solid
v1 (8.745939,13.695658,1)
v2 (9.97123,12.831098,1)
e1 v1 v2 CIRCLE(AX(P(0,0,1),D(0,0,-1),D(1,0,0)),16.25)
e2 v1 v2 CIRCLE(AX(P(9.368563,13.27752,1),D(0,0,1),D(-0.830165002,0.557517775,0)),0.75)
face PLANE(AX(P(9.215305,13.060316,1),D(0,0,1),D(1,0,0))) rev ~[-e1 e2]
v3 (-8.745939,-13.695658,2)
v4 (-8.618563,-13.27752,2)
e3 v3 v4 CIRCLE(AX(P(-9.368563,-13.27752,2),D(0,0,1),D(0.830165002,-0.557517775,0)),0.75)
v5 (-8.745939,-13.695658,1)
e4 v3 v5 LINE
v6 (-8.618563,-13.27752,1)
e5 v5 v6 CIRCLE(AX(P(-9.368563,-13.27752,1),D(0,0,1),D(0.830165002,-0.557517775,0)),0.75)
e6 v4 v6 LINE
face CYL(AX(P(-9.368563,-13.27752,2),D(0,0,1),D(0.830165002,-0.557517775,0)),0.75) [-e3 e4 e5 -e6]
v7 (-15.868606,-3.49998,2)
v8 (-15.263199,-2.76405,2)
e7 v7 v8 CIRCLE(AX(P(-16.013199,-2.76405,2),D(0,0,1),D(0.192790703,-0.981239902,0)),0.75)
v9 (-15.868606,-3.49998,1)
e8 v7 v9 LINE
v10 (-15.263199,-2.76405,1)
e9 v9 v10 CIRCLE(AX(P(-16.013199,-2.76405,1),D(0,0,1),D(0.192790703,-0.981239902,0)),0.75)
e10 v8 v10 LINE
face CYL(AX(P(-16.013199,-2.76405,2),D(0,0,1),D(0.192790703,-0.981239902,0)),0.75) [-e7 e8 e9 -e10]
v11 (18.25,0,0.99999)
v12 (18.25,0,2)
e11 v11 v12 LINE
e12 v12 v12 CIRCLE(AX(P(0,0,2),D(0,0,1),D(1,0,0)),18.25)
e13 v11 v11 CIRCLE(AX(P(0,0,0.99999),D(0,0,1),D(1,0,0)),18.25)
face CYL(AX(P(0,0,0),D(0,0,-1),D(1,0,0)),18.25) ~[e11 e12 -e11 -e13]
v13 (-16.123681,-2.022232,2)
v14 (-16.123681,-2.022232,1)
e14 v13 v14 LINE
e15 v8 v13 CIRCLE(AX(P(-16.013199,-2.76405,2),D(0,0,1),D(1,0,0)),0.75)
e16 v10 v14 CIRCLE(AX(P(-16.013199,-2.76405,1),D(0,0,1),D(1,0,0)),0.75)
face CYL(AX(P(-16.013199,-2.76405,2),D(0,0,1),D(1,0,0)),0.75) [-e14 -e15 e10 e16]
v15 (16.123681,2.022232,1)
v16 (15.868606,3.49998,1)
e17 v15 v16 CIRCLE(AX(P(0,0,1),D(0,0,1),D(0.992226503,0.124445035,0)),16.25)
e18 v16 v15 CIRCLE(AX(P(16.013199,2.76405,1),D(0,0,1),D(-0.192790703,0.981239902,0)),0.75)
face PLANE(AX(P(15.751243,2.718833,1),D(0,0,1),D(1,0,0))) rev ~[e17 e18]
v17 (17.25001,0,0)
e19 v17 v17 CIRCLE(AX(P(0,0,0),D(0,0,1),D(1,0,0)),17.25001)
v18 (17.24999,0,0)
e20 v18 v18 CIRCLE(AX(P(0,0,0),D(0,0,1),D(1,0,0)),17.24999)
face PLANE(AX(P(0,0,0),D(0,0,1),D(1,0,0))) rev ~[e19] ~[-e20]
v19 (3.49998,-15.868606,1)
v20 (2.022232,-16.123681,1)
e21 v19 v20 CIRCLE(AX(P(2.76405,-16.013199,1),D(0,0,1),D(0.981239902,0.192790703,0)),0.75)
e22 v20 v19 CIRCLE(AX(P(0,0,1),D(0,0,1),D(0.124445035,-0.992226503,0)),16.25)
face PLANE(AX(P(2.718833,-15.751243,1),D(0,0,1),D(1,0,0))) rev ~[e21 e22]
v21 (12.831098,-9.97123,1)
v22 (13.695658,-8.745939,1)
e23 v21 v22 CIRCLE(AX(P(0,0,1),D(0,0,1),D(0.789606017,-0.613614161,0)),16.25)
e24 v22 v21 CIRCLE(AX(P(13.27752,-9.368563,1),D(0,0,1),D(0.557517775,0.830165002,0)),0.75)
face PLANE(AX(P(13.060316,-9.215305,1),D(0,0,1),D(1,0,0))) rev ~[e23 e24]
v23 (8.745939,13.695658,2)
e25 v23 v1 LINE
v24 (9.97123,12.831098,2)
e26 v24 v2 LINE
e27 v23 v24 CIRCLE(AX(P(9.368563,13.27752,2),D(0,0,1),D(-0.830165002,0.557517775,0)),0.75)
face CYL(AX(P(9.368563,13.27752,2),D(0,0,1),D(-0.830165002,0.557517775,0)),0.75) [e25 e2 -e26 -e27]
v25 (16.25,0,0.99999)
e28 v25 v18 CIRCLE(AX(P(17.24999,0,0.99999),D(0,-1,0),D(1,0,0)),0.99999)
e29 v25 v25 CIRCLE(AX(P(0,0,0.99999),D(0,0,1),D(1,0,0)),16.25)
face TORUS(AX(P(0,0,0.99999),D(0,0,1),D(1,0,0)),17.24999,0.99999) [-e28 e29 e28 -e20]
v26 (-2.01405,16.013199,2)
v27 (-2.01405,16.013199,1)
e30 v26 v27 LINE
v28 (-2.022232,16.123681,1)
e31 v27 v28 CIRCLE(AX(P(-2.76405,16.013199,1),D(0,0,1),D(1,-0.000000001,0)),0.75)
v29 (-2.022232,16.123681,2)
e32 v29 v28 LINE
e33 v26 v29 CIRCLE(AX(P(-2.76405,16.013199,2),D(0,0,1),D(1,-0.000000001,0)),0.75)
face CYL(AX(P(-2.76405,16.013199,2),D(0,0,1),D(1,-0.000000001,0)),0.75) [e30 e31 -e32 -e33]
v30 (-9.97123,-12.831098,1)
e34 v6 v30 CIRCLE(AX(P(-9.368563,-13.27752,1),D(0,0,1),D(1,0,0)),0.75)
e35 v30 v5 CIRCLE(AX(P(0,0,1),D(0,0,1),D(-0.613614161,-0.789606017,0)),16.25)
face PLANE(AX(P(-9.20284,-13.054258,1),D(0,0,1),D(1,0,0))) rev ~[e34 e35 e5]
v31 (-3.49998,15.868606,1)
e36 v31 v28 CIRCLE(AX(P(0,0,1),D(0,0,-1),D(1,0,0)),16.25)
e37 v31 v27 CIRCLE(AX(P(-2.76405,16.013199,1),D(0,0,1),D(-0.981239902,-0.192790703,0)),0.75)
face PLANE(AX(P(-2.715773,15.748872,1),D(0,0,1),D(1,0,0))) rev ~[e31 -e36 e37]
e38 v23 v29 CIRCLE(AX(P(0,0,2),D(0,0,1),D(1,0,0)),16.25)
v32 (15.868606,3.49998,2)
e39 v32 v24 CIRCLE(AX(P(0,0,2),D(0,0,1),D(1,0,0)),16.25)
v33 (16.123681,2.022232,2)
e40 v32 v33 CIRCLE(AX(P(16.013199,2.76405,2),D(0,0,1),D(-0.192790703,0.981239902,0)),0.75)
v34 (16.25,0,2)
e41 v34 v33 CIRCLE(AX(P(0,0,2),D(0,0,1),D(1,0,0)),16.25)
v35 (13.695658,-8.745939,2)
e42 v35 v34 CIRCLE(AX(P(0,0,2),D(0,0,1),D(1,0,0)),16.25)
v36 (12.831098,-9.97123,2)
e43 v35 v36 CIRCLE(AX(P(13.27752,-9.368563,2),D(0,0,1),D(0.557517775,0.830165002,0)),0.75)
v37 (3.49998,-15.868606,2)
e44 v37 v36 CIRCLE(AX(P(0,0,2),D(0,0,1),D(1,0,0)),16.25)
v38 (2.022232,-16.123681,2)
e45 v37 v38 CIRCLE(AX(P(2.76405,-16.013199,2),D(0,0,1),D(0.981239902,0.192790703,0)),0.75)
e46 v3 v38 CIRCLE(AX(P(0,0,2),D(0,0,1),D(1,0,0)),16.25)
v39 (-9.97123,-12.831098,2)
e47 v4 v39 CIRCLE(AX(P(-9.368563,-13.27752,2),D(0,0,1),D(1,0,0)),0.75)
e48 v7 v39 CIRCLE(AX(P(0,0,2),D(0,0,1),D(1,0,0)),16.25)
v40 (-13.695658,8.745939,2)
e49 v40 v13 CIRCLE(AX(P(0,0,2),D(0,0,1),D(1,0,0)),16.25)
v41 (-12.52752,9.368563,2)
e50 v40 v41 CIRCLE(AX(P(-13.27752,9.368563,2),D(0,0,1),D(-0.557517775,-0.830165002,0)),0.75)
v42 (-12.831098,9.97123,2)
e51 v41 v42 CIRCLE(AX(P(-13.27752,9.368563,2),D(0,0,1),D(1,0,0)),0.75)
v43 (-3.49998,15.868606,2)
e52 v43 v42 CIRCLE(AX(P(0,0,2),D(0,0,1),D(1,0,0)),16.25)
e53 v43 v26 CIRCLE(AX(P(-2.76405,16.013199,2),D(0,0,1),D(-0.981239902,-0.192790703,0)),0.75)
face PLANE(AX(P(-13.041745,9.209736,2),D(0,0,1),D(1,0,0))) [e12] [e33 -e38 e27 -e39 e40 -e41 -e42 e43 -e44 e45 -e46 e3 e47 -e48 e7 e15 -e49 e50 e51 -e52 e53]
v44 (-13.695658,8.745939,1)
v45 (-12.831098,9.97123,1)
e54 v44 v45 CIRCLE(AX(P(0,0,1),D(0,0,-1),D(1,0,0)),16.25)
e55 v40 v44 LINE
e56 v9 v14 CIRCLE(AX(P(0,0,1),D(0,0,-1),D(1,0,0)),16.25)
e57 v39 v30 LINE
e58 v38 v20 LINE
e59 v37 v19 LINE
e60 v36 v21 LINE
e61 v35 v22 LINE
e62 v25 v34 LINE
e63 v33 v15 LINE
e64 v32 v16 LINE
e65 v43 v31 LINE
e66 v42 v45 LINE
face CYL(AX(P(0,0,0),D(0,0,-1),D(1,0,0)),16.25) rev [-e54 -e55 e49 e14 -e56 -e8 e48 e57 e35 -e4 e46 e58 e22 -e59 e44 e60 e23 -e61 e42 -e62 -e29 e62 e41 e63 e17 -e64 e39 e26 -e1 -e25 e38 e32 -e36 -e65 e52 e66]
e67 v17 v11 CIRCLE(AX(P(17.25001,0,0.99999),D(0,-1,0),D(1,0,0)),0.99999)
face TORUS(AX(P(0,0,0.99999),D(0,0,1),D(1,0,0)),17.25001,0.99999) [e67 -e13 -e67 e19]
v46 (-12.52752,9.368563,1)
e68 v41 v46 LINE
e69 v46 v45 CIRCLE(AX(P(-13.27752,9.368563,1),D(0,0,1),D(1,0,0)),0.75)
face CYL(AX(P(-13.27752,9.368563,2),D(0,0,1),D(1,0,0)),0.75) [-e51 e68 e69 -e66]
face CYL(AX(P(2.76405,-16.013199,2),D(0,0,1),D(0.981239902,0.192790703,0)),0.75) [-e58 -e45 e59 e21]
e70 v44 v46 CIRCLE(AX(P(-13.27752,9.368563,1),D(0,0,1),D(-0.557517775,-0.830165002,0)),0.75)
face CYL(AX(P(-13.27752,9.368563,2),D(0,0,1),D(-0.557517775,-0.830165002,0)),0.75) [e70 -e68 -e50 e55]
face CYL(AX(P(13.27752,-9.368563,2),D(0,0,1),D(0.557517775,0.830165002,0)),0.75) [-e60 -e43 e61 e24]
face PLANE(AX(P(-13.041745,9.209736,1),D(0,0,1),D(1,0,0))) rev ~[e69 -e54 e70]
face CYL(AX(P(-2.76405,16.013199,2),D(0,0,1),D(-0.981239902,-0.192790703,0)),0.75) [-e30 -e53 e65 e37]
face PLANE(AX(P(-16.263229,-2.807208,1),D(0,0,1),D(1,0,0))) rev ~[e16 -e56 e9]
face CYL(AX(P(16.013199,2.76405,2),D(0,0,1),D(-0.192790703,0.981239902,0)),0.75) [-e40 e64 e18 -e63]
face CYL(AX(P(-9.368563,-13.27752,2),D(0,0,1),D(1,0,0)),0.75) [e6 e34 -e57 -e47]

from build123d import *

# Parameters (mm, degrees)
F0_R     = 18.25
F0_R_2   = 16.25
F1_DEPTH = 2
F3_DEPTH = 1
F4_R     = 0.99999


# Not quite as in the source:
# - a fillet or chamfer is up to 0.001 mm smaller than in the source, because OpenCascade refuses the exact size


with BuildPart() as f1:
    # F0 (on Top) → F1 (new body)
    with BuildSketch(Plane.XY):
        Circle(F0_R)
        Circle(F0_R_2, mode=Mode.SUBTRACT)
    extrude(amount=F1_DEPTH)

    # F2 (on face) → F3 (join)
    with BuildSketch(Plane.XY.offset(2)):
        with BuildLine():
            ThreePointArc((-13.6956579083, 8.7459393126), (-12.9247475177, 8.70670819), (-12.5275195769, 9.368563064))
            ThreePointArc((-12.5275195769, 9.368563064), (-12.6077000662, 9.7059676033), (-12.8310977719, 9.9712301131))
            ThreePointArc((-12.8310977719, 9.9712301131), (-13.2775195769, 9.368563064), (-13.6956579083, 8.7459393126))
        make_face()
        with BuildLine():
            ThreePointArc((-13.6956579083, 8.7459393126), (-13.2775195769, 9.368563064), (-12.8310977719, 9.9712301131))
            ThreePointArc((-12.8310977719, 9.9712301131), (-13.8903281728, 9.8009582824), (-13.6956579083, 8.7459393126))
        make_face()
        with BuildLine():
            ThreePointArc((-2.0222318148, 16.1236806743), (-2.7640496576, 16.0131986027), (-3.4999795839, 15.8686055755))
            ThreePointArc((-3.4999795839, 15.8686055755), (-2.6914116674, 15.2667244087), (-2.0140496576, 16.0131986027))
            ThreePointArc((-2.0140496576, 16.0131986027), (-2.016097994, 16.0685909213), (-2.0222318148, 16.1236806743))
        make_face()
        with BuildLine():
            ThreePointArc((-2.0222318148, 16.1236806743), (-2.8916211803, 16.7522693075), (-3.4999795839, 15.8686055755))
            ThreePointArc((-3.4999795839, 15.8686055755), (-2.7640496576, 16.0131986027), (-2.0222318148, 16.1236806743))
        make_face()
        with BuildLine():
            ThreePointArc((-15.8686055755, -3.4999795839), (-16.0131986027, -2.7640496576), (-16.1236806743, -2.0222318148))
            ThreePointArc((-16.1236806743, -2.0222318148), (-16.7522693075, -2.8916211803), (-15.8686055755, -3.4999795839))
        make_face()
        with BuildLine():
            ThreePointArc((-15.2631986027, -2.7640496576), (-15.5234851935, -2.1959996802), (-16.1236806743, -2.0222318148))
            ThreePointArc((-16.1236806743, -2.0222318148), (-16.0131986027, -2.7640496576), (-15.8686055755, -3.4999795839))
            ThreePointArc((-15.8686055755, -3.4999795839), (-15.4339988227, -3.2405238067), (-15.2631986027, -2.7640496576))
        make_face()
        with BuildLine():
            ThreePointArc((9.9712301131, 12.8310977719), (9.368563064, 13.2775195769), (8.7459393126, 13.6956579083))
            ThreePointArc((8.7459393126, 13.6956579083), (8.9361678457, 12.664710981), (9.9712301131, 12.8310977719))
        make_face()
        with BuildLine():
            ThreePointArc((10.118563064, 13.2775195769), (9.5871176184, 13.9949691617), (8.7459393126, 13.6956579083))
            ThreePointArc((8.7459393126, 13.6956579083), (9.368563064, 13.2775195769), (9.9712301131, 12.8310977719))
            ThreePointArc((9.9712301131, 12.8310977719), (10.0807780199, 13.0424666965), (10.118563064, 13.2775195769))
        make_face()
        with BuildLine():
            ThreePointArc((-8.618563064, -13.2775195769), (-9.1335101836, -12.565304621), (-9.9712301131, -12.8310977719))
            ThreePointArc((-9.9712301131, -12.8310977719), (-9.368563064, -13.2775195769), (-8.7459393126, -13.6956579083))
            ThreePointArc((-8.7459393126, -13.6956579083), (-8.6511134792, -13.4960741312), (-8.618563064, -13.2775195769))
        make_face()
        with BuildLine():
            ThreePointArc((16.1236806743, 2.0222318148), (16.0131986027, 2.7640496576), (15.8686055755, 3.4999795839))
            ThreePointArc((15.8686055755, 3.4999795839), (15.274127898, 2.6364781349), (16.1236806743, 2.0222318148))
        make_face()
        with BuildLine():
            ThreePointArc((3.4999795839, -15.8686055755), (2.6364781349, -15.274127898), (2.0222318148, -16.1236806743))
            ThreePointArc((2.0222318148, -16.1236806743), (2.7640496576, -16.0131986027), (3.4999795839, -15.8686055755))
        make_face()
        with BuildLine():
            ThreePointArc((13.6956579083, -8.7459393126), (12.664710981, -8.9361678457), (12.8310977719, -9.9712301131))
            ThreePointArc((12.8310977719, -9.9712301131), (13.2775195769, -9.368563064), (13.6956579083, -8.7459393126))
        make_face()
    extrude(amount=-F3_DEPTH)

    # F4 (radius 1 in the source; OpenCascade refuses exactly that, so slightly less here)
    f4_edges = [f1.edges().sort_by_distance(p)[0] for p in [
        (-18.25, 0, 0),
        (-16.25, 0, 0),
    ]]
    fillet(f4_edges, radius=F4_R)


solid = f1.part
